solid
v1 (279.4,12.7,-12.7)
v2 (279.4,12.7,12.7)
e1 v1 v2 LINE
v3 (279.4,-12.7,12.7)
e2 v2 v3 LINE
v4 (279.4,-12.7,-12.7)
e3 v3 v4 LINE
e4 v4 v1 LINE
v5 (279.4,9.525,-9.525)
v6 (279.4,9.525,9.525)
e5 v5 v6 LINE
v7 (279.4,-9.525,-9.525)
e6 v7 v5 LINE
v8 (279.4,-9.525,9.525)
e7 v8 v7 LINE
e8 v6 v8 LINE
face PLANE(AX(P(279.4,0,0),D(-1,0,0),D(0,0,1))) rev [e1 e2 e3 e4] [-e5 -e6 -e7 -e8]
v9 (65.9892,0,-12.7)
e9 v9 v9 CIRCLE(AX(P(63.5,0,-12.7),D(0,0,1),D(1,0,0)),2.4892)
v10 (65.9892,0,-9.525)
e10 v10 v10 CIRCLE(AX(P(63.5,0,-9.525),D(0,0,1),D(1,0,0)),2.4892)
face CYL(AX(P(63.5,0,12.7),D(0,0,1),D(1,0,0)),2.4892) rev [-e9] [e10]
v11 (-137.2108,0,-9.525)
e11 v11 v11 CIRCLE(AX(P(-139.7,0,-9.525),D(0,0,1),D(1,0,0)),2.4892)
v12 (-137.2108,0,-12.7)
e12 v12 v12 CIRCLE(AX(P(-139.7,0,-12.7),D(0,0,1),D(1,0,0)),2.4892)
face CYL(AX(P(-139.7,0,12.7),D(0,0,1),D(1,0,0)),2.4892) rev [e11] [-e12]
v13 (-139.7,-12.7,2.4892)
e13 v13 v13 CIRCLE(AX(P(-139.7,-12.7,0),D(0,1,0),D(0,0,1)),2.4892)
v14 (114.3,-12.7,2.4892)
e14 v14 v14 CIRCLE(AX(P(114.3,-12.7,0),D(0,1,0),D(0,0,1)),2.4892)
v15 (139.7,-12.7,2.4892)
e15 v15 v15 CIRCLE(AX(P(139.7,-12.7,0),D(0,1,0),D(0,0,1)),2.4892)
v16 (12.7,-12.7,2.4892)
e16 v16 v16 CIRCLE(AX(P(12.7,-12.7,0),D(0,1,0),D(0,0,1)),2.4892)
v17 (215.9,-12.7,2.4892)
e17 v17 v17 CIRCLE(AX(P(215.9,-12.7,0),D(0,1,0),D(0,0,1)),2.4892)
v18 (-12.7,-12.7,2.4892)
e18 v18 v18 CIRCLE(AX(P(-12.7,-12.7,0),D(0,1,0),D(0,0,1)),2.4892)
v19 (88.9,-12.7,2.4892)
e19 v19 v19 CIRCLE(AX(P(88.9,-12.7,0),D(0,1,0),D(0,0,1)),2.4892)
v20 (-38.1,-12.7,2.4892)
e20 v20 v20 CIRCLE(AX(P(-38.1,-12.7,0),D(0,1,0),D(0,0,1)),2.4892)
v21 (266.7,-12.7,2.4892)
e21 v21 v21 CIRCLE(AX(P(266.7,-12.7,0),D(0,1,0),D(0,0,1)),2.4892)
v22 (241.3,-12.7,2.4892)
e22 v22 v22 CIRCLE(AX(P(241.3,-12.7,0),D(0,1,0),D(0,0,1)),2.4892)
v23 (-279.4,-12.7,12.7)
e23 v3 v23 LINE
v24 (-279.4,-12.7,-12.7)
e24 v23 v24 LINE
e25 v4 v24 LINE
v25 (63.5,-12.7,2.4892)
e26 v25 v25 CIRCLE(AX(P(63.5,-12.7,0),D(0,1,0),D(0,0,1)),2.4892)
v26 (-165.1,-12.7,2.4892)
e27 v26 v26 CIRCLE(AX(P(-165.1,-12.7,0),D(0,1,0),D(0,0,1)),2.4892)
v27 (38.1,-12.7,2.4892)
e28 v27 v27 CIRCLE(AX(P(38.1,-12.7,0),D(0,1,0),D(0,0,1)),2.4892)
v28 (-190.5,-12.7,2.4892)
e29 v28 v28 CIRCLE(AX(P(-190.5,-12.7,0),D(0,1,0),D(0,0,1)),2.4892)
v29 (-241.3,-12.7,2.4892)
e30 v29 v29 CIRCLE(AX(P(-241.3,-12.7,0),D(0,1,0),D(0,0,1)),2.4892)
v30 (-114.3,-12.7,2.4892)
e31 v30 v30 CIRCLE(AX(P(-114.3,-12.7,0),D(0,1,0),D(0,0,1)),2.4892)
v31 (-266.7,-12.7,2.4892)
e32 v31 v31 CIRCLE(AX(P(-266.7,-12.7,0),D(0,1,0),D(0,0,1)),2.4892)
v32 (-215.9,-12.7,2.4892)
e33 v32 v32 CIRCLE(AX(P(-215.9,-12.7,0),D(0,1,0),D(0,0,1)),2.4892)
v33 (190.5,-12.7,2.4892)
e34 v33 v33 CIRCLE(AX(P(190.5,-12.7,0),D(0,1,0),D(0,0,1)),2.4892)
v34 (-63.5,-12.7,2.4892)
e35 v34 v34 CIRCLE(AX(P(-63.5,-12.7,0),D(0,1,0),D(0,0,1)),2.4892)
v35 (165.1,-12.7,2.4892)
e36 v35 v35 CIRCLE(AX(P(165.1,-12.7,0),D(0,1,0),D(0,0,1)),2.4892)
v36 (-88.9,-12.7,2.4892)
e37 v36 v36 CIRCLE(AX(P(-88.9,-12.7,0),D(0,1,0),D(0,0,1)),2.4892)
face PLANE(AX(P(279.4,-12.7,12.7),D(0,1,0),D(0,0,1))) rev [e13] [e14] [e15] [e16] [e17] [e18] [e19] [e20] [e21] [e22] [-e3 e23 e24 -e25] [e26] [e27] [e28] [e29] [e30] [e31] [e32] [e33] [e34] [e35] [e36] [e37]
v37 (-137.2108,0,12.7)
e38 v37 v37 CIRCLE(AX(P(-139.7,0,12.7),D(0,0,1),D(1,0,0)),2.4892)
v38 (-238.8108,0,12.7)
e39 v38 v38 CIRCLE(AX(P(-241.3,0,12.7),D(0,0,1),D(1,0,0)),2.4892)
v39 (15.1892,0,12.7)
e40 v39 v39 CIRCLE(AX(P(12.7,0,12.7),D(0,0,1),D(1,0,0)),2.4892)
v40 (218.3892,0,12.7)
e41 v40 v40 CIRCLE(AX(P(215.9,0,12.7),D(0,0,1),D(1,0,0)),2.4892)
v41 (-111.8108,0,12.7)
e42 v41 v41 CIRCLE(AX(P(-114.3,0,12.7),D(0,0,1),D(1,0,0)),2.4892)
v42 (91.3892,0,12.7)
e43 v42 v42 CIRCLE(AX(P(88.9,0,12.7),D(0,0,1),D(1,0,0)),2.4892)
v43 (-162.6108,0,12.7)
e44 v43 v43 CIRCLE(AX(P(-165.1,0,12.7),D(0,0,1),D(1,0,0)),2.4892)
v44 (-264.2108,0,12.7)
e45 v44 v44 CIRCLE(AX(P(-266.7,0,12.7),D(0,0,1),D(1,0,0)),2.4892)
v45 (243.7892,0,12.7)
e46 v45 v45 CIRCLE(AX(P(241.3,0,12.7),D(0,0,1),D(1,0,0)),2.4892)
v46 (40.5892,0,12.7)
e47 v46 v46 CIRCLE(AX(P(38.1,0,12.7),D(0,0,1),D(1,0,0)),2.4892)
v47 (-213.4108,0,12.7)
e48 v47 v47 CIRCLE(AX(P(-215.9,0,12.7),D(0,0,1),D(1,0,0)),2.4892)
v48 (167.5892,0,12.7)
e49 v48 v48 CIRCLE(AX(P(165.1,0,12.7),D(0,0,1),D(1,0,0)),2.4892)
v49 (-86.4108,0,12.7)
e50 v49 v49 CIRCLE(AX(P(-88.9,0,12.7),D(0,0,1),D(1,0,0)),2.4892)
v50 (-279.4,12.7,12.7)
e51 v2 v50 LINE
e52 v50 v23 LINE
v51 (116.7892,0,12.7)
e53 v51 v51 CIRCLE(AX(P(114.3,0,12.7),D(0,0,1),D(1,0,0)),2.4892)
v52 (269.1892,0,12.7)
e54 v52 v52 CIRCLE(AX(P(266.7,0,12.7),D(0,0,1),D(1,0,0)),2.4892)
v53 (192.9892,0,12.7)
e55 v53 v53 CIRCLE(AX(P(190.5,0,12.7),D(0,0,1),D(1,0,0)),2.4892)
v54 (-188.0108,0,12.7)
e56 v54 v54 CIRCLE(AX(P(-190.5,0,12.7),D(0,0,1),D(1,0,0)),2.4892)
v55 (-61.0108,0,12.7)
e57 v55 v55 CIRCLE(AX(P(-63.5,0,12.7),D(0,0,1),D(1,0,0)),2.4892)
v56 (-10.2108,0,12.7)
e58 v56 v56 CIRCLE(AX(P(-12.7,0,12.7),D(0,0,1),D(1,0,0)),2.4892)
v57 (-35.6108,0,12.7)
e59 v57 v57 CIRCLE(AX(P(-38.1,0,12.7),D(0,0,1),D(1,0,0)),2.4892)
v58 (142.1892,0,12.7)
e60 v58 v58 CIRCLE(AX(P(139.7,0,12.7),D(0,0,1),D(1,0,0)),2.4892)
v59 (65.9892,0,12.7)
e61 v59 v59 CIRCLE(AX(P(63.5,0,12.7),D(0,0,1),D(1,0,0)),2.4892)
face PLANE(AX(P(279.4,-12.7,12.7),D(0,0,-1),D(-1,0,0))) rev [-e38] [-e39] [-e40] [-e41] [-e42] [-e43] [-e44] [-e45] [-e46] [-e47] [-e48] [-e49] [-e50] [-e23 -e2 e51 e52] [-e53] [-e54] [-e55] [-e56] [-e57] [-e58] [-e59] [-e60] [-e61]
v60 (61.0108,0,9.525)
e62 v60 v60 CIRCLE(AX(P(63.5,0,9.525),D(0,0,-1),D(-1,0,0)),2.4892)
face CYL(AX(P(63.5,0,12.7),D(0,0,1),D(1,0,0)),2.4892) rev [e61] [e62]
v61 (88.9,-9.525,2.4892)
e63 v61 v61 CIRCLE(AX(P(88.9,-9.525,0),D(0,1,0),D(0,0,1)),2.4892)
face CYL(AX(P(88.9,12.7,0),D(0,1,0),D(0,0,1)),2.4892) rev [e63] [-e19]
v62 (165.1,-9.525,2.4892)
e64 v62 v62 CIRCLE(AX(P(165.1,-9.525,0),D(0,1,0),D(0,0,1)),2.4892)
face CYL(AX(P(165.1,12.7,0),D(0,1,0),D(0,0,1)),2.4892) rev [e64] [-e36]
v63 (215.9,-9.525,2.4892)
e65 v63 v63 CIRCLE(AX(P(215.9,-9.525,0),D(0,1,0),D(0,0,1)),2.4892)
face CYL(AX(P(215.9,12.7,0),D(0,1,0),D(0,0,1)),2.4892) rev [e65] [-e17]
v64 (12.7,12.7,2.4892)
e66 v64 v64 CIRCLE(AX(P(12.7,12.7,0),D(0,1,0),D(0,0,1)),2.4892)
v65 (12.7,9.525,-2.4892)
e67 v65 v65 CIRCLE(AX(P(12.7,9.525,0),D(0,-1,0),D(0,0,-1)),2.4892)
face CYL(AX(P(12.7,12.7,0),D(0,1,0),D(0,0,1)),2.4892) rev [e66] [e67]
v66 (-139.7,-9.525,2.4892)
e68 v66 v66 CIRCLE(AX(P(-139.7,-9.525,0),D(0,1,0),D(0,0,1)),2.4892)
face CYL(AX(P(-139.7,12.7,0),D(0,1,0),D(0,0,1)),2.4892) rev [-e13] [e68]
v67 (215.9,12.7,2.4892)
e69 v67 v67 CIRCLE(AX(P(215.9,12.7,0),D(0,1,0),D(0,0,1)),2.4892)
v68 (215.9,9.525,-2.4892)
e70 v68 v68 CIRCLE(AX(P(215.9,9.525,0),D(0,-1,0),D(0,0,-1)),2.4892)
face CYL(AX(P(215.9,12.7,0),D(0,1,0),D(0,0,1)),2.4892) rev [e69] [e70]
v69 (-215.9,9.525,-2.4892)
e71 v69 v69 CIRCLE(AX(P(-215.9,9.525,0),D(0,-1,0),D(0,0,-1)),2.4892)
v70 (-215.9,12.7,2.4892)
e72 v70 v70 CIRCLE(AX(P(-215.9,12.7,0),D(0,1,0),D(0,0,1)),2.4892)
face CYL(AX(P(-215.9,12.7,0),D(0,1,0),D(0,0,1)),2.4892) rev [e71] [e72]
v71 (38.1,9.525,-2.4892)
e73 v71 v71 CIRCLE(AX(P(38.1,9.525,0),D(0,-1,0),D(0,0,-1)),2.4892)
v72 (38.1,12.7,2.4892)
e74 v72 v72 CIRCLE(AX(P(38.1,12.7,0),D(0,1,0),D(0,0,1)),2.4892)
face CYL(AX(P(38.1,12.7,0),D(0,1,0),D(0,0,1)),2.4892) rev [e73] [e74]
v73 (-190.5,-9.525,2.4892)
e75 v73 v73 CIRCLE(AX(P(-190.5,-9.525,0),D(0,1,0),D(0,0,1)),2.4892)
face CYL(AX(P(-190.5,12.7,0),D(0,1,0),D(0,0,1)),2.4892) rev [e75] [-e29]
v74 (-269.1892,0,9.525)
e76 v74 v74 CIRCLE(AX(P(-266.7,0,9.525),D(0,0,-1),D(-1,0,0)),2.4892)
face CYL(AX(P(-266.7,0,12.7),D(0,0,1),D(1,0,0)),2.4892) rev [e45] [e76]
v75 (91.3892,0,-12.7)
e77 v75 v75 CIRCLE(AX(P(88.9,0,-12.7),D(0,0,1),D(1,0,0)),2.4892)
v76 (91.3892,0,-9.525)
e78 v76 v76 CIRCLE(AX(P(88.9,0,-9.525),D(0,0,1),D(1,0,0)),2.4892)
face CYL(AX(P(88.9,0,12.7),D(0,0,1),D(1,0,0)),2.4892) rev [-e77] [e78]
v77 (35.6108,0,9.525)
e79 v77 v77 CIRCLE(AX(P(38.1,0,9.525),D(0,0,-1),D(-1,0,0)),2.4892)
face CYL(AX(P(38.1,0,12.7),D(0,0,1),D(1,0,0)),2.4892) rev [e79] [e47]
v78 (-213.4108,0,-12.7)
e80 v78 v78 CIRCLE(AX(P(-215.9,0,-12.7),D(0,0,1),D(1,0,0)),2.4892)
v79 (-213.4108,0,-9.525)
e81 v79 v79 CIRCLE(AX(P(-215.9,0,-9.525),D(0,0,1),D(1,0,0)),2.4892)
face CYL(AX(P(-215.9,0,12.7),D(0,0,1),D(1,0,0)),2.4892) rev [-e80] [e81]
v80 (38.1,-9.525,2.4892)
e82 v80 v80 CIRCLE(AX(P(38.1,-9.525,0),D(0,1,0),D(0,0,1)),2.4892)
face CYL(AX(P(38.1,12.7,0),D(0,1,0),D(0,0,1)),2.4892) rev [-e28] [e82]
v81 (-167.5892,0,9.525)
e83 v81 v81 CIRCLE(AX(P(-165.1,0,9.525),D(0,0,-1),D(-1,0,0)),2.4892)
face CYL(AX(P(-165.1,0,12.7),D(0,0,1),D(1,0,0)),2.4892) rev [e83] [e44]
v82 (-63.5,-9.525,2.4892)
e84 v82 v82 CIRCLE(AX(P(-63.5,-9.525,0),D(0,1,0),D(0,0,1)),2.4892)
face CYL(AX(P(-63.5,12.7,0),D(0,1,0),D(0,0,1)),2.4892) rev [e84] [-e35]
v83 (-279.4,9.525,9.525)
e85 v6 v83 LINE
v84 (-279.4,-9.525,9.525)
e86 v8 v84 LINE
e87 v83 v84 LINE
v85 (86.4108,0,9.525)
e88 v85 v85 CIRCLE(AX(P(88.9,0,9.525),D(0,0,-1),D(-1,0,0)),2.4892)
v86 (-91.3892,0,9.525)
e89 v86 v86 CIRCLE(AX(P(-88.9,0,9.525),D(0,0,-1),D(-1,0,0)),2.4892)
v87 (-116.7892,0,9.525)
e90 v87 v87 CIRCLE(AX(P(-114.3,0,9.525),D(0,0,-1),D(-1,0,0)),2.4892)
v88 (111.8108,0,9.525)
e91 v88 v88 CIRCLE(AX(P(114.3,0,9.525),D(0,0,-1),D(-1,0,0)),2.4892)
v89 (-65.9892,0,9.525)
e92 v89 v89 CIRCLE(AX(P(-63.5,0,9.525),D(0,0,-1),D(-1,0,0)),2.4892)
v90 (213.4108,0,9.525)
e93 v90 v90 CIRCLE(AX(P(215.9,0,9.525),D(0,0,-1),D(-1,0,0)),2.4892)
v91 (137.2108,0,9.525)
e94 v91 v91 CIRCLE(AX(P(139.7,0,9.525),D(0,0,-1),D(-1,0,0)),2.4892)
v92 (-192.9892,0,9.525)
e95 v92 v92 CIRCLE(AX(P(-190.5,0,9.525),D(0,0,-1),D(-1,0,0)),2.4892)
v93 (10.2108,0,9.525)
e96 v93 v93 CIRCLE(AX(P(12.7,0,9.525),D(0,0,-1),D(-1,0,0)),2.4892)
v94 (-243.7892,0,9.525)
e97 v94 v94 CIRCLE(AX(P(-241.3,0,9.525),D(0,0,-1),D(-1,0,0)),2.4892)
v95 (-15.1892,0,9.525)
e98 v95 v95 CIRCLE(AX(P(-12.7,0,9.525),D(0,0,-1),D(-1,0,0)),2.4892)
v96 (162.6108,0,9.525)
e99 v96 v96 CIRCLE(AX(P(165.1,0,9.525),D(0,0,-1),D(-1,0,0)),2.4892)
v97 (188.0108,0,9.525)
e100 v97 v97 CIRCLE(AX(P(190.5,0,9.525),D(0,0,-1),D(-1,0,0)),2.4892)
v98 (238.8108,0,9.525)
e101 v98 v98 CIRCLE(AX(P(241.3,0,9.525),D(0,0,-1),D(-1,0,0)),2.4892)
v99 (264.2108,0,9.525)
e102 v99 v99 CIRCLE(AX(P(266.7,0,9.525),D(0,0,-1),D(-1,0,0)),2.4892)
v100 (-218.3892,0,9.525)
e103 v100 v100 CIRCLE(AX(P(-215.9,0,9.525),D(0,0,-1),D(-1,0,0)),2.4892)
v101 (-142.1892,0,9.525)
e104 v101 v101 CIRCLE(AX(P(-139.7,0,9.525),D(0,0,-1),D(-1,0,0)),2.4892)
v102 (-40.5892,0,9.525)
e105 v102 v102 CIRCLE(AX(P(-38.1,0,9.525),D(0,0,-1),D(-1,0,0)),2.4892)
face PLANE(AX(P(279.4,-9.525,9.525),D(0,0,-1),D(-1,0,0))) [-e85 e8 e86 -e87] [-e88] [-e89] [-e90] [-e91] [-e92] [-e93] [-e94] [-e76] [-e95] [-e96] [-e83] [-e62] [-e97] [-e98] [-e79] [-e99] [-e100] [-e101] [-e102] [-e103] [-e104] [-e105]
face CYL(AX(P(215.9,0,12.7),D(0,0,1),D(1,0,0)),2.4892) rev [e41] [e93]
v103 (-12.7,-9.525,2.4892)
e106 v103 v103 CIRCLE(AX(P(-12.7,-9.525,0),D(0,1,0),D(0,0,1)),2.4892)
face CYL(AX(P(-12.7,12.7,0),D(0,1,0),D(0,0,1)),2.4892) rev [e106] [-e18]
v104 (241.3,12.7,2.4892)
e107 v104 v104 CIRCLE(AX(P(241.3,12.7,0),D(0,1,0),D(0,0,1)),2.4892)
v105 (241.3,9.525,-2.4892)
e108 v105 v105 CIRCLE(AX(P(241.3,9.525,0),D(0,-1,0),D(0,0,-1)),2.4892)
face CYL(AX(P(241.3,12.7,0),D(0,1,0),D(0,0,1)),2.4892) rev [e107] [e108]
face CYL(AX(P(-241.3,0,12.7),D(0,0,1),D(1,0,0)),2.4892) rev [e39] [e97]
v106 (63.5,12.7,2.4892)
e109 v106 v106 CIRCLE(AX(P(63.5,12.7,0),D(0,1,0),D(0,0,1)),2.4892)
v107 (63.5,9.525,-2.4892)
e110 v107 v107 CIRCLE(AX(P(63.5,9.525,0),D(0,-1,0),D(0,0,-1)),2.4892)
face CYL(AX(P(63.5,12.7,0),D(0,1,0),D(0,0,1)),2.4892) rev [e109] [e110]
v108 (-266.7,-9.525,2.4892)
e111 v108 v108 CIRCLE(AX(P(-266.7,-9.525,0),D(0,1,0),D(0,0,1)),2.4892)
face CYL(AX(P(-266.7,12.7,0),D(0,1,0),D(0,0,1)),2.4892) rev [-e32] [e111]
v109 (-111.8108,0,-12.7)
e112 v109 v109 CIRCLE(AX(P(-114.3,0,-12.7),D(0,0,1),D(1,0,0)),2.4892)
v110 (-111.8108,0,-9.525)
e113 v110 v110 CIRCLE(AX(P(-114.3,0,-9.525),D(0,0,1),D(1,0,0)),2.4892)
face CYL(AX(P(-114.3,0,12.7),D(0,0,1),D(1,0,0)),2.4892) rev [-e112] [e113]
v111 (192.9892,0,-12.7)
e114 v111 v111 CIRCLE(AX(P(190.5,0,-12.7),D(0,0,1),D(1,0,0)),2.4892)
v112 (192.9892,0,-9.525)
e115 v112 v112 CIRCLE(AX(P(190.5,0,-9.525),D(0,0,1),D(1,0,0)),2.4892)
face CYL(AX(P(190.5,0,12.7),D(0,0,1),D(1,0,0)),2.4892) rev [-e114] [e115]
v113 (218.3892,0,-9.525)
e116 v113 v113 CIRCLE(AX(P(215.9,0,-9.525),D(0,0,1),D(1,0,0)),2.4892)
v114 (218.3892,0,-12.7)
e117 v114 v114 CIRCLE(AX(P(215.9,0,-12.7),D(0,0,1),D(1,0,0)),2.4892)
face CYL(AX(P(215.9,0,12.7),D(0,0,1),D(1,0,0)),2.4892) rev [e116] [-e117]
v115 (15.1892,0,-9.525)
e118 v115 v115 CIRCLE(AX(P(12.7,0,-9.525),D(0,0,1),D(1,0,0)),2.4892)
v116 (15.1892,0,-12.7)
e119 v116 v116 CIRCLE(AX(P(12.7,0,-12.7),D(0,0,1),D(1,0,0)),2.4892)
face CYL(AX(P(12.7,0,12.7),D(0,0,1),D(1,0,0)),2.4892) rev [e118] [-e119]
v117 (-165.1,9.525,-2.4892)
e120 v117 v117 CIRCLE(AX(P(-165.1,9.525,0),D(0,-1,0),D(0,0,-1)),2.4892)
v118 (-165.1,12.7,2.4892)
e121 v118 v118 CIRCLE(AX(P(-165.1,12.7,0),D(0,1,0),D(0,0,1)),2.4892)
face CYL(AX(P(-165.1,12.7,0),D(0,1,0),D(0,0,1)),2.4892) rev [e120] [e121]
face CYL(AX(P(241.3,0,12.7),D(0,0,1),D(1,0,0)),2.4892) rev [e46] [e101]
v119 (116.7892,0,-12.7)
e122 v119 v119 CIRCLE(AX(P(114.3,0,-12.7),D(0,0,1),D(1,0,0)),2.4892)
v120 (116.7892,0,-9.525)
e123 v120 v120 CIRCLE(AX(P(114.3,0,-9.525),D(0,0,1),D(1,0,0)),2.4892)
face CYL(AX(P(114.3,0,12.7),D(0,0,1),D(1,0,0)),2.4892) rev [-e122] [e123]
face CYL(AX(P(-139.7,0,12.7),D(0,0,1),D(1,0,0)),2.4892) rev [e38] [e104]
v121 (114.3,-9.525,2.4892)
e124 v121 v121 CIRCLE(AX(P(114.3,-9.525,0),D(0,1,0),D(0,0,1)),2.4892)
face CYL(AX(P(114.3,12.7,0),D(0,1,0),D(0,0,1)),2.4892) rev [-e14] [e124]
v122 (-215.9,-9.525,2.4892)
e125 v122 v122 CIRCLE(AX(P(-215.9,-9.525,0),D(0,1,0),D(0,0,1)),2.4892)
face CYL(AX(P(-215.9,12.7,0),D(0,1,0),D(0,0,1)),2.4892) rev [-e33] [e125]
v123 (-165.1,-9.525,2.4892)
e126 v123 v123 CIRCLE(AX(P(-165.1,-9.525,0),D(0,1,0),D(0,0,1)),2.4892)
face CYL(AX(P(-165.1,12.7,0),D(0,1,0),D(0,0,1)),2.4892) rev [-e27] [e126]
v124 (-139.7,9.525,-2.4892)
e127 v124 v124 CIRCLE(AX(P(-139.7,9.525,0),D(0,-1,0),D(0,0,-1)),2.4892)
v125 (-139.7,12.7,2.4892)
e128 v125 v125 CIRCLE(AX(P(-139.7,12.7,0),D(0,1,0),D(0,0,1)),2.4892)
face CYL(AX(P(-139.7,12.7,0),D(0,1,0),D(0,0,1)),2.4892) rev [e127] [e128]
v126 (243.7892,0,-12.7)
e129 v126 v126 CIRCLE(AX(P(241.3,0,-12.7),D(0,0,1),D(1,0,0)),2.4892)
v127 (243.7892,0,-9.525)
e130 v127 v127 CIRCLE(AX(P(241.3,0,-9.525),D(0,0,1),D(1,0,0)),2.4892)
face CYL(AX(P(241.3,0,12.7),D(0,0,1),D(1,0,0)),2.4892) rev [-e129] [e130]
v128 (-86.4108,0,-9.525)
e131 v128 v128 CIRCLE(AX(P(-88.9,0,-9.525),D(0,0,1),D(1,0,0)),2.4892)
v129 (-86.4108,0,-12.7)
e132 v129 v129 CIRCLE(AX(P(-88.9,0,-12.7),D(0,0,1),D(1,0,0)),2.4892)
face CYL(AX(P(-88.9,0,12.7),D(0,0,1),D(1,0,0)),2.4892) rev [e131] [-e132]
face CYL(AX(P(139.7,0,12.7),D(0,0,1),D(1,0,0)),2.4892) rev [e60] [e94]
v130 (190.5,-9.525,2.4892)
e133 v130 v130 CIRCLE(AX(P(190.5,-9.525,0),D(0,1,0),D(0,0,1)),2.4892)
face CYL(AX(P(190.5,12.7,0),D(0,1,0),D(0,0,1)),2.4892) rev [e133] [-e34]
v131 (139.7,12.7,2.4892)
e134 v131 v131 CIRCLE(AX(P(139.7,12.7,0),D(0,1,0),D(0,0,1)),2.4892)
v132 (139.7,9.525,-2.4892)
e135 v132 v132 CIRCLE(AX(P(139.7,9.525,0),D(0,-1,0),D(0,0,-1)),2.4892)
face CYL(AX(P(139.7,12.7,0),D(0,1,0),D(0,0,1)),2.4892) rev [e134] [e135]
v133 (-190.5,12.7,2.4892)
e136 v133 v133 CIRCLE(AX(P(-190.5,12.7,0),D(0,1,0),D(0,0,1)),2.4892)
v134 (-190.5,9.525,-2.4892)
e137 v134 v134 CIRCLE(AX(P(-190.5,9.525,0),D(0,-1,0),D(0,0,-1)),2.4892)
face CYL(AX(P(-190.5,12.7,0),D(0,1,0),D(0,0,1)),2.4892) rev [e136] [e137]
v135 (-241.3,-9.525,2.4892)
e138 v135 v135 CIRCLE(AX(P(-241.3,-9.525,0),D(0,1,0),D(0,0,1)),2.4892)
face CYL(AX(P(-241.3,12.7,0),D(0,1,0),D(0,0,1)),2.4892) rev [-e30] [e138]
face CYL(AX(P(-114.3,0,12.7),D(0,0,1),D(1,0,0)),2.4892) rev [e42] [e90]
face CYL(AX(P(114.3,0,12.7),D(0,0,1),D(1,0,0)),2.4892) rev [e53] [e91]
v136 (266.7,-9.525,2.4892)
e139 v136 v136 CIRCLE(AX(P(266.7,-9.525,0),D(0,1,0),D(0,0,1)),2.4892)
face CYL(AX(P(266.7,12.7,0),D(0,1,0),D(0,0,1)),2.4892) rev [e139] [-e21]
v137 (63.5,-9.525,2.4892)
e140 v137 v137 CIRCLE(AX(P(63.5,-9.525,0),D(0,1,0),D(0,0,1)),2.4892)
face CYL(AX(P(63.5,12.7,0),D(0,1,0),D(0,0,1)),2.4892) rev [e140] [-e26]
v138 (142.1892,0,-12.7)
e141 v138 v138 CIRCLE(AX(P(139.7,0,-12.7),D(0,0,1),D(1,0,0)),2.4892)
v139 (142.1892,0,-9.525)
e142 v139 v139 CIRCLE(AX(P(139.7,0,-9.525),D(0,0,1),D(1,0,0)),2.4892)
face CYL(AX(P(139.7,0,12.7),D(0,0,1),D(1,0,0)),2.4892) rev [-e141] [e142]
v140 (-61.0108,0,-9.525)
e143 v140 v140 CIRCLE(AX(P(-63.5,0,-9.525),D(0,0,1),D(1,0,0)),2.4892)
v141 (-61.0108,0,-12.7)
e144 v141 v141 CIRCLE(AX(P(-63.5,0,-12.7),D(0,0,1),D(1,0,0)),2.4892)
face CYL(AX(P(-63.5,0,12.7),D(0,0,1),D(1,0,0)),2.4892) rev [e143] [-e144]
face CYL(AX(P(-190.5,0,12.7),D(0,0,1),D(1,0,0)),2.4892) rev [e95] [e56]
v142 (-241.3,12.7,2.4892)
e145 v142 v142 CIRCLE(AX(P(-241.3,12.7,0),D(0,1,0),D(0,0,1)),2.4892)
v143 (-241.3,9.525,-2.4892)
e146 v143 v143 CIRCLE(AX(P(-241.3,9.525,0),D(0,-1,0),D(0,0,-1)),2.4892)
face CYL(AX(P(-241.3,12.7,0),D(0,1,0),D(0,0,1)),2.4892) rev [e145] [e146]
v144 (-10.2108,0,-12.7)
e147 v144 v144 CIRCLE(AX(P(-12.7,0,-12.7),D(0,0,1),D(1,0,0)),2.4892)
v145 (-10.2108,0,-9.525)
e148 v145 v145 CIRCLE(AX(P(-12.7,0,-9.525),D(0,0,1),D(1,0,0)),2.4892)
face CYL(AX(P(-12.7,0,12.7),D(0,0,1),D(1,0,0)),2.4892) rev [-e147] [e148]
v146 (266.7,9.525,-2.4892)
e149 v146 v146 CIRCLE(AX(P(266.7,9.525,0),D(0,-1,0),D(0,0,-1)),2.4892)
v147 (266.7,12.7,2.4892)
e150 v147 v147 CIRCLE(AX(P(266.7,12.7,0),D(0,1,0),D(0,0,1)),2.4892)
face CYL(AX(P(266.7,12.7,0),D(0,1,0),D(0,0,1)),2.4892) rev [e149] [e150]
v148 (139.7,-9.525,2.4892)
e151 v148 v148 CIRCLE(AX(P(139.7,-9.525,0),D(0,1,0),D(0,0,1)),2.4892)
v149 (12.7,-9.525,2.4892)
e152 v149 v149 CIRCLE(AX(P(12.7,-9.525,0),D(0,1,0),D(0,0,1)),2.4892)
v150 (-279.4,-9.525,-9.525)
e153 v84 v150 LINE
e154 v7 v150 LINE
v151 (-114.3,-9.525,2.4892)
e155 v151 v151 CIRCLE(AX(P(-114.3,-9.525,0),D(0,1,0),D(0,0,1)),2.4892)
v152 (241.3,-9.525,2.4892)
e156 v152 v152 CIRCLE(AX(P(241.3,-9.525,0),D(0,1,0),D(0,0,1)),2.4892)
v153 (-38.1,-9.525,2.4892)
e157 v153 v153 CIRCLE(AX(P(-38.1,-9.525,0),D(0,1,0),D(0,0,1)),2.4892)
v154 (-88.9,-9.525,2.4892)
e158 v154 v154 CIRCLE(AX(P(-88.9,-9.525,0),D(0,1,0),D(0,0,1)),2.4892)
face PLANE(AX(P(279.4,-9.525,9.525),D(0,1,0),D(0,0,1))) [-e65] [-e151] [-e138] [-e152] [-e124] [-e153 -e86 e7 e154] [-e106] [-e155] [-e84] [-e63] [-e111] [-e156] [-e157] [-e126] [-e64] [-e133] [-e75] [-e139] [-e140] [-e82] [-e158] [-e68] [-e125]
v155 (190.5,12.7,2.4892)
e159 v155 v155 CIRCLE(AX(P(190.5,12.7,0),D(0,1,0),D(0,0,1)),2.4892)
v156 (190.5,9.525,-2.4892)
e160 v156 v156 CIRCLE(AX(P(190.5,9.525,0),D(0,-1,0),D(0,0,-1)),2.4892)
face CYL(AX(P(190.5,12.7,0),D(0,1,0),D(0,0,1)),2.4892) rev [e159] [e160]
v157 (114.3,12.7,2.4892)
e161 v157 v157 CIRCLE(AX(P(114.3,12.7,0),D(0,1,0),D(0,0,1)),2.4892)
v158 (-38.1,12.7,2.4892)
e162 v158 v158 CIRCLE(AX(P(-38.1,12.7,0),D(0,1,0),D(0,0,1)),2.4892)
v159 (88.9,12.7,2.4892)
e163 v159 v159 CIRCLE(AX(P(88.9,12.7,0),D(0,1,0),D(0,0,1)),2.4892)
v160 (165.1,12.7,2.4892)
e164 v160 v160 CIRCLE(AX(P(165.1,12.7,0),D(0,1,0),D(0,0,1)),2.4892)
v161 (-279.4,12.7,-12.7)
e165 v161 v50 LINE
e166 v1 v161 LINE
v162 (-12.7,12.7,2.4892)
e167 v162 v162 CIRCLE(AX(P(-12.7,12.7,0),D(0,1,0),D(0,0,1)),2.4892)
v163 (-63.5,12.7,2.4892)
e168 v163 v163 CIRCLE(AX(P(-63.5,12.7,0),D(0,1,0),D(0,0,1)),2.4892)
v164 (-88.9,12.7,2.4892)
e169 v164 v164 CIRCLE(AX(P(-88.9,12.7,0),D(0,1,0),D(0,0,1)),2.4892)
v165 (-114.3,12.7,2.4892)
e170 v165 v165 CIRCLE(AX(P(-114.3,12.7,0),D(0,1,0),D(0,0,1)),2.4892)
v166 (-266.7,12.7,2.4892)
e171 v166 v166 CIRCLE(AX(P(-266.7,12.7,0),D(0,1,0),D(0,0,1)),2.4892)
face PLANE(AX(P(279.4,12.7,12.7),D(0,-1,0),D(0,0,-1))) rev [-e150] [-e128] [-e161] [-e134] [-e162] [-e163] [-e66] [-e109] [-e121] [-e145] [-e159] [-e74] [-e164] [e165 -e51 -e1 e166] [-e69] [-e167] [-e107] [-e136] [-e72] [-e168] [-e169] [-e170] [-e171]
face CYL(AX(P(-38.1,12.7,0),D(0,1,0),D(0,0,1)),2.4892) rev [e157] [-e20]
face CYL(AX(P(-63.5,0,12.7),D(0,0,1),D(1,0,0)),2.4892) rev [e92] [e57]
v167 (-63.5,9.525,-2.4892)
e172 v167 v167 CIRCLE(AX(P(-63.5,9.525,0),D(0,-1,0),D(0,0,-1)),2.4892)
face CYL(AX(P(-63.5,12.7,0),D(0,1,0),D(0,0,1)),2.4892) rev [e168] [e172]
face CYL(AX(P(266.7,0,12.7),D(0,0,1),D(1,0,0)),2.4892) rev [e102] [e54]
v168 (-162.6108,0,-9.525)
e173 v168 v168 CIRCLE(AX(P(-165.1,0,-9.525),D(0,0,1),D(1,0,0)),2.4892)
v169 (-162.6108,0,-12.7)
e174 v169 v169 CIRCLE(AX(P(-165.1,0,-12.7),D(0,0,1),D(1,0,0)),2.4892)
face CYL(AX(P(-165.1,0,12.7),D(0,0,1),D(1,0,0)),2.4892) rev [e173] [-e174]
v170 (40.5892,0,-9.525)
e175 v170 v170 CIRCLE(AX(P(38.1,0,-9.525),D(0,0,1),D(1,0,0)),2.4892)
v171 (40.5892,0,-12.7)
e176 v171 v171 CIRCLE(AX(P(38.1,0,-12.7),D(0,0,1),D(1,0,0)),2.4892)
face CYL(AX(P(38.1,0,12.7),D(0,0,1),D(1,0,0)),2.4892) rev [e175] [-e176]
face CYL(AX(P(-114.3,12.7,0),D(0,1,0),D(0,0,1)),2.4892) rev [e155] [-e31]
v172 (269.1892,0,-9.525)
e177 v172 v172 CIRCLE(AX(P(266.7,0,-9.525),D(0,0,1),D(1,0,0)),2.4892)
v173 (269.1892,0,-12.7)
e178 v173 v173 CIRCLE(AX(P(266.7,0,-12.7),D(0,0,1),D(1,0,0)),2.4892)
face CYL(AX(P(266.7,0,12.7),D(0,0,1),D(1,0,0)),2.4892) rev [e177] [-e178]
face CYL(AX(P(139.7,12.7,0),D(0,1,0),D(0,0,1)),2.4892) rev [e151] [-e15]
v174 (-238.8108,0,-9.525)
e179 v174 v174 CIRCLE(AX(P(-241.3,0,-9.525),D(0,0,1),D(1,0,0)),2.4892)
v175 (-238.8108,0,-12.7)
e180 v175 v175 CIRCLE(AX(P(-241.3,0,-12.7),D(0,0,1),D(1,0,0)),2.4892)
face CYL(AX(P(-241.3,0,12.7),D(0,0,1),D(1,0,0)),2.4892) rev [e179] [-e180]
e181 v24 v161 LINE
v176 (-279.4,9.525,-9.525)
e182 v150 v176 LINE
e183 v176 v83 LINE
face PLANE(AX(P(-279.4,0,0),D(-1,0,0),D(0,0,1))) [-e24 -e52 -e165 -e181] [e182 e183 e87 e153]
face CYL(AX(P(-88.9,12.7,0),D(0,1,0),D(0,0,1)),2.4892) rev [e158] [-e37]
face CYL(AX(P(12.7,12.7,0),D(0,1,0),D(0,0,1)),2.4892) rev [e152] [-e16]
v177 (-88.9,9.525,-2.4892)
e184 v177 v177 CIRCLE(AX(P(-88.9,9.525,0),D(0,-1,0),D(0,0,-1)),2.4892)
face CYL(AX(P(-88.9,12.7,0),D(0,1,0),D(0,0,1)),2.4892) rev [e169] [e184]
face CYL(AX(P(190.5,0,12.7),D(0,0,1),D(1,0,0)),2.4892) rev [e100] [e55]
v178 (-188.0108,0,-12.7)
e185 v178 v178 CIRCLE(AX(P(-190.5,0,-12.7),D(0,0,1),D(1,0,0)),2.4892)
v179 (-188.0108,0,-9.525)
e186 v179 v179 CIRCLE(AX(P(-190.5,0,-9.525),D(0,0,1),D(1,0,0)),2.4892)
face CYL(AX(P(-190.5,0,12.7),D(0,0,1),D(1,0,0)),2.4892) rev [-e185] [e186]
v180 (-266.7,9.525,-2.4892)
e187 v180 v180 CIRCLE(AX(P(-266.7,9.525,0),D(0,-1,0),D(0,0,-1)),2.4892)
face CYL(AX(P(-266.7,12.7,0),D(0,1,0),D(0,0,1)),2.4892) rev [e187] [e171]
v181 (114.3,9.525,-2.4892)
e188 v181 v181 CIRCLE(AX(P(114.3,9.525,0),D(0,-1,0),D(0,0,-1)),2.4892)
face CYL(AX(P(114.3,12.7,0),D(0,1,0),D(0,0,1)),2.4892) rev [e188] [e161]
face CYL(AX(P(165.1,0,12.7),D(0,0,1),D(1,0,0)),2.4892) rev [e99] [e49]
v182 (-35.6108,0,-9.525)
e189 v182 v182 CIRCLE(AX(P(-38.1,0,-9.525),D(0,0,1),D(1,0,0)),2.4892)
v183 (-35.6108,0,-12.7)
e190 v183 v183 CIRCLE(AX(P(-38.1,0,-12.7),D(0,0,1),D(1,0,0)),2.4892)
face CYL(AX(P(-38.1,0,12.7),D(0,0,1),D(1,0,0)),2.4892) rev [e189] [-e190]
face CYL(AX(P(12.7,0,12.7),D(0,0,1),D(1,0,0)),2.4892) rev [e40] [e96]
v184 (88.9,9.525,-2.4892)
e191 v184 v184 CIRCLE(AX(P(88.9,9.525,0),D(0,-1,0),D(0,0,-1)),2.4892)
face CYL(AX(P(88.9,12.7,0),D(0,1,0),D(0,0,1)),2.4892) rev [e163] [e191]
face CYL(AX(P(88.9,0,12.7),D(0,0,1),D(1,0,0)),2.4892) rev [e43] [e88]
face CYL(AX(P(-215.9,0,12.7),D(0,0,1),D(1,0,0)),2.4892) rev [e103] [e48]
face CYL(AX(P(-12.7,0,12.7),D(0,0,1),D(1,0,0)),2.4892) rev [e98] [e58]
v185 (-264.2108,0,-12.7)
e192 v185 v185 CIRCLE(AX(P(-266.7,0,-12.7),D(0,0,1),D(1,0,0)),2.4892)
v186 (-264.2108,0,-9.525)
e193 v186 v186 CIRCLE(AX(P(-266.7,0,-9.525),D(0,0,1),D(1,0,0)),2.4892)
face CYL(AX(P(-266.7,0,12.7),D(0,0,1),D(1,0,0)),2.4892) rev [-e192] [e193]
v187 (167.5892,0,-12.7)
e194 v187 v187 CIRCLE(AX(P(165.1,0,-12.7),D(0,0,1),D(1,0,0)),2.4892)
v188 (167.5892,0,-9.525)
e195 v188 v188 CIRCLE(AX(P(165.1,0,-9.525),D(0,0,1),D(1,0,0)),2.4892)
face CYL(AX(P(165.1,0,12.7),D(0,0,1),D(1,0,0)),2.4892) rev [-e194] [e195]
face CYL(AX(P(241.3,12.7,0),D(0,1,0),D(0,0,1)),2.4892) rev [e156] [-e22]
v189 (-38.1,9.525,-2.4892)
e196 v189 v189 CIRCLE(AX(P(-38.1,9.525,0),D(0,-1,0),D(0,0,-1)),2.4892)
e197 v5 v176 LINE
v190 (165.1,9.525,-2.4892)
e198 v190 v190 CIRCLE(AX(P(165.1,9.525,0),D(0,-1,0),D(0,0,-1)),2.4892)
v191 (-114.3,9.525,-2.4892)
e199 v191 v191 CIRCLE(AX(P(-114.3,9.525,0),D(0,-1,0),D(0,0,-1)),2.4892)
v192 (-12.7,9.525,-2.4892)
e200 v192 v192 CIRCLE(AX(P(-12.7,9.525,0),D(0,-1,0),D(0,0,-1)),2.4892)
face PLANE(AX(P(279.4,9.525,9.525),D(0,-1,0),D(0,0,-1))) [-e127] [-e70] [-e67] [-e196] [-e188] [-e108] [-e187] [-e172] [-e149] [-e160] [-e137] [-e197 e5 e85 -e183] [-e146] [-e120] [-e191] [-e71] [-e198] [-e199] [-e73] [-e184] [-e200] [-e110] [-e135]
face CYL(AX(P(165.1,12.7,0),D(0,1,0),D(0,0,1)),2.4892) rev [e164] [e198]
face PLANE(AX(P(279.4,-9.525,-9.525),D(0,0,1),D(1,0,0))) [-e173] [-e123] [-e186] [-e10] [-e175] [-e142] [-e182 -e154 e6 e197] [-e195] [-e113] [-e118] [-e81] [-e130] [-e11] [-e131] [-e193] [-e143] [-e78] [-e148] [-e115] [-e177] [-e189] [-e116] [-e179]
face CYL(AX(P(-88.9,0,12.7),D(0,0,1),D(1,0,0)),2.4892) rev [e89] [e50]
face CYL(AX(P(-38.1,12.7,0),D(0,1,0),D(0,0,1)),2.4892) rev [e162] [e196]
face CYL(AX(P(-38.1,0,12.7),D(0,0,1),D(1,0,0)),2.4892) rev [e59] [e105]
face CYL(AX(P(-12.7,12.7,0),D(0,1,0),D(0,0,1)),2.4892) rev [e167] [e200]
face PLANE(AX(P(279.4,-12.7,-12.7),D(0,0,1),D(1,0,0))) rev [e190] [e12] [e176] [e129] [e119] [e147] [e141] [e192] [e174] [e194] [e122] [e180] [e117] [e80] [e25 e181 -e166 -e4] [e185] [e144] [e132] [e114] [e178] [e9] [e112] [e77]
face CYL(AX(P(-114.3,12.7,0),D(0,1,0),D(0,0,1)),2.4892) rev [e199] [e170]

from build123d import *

# Parameters (mm, degrees)
SKETCH1_W             = 25.4
SKETCH1_H             = 25.4
SKETCH1_W_2           = 19.05
SKETCH1_H_2           = 19.05
BOSS_EXTRUDE1_DEPTH   = 279.4
SKETCH3_W             = 2.4892
SKETCH3_H             = 25.4
SKETCH3_AT_POINT_2_W  = 2.4892
SKETCH3_AT_POINT_2_H  = 25.4
LPATTERN1_START       = -12.7
LPATTERN1_OUTLINE_R   = 2.4892
LPATTERN1_DEPTH       = 25.4
LPATTERN1_2_OUTLINE_R = 2.4892
LPATTERN1_2_DEPTH     = 25.4


# Read off the part's stored shape, not the designer's step: LPattern1
with BuildPart() as part:
    # Sketch1 → Boss-Extrude1 (new, symmetric)
    with BuildSketch(Plane(origin=(0, 0, 0), x_dir=(0, 0, -1), z_dir=(1, 0, 0))):
        Rectangle(SKETCH1_W, SKETCH1_H)
        Rectangle(SKETCH1_W_2, SKETCH1_H_2, mode=Mode.SUBTRACT)
    extrude(amount=BOSS_EXTRUDE1_DEPTH, both=True)

    # Sketch3 → #9 (0.196) Diameter Hole1 (revolve, cut)
    with BuildSketch(Plane(origin=(266.7, 12.7, 0), x_dir=(0, 0, 1), z_dir=(1, 0, 0))):
        with Locations((1.2446, 12.7)):
            Rectangle(SKETCH3_W, SKETCH3_H)
    revolve(axis=Axis((266.7, 19.05, 0), (0, -1, 0)), mode=Mode.SUBTRACT)

    # Sketch3 at point 2 (carried to point 2, square into its face) → #9 (0.196) Diameter Hole1 at 2 (revolve, cut)
    with BuildSketch(Plane(origin=(266.7, 0, 12.7), x_dir=(0, -1, 0), z_dir=(1, 0, 0))):
        with Locations((1.2446, 12.7)):
            Rectangle(SKETCH3_AT_POINT_2_W, SKETCH3_AT_POINT_2_H)
    revolve(axis=Axis((266.7, 0, 19.05), (0, 0, -1)), mode=Mode.SUBTRACT)

    # LPattern1 outline → LPattern1 (cut)
    with BuildSketch(Plane.XY.offset(LPATTERN1_START)):
        with Locations((241.3, 0)):
            Circle(LPATTERN1_OUTLINE_R)
        with Locations((215.9, 0)):
            Circle(LPATTERN1_OUTLINE_R)
        with Locations((190.5, 0)):
            Circle(LPATTERN1_OUTLINE_R)
        with Locations((165.1, 0)):
            Circle(LPATTERN1_OUTLINE_R)
        with Locations((139.7, 0)):
            Circle(LPATTERN1_OUTLINE_R)
        with Locations((114.3, 0)):
            Circle(LPATTERN1_OUTLINE_R)
        with Locations((88.9, 0)):
            Circle(LPATTERN1_OUTLINE_R)
        with Locations((63.5, 0)):
            Circle(LPATTERN1_OUTLINE_R)
        with Locations((38.1, 0)):
            Circle(LPATTERN1_OUTLINE_R)
        with Locations((12.7, 0)):
            Circle(LPATTERN1_OUTLINE_R)
        with Locations((-12.7, 0)):
            Circle(LPATTERN1_OUTLINE_R)
        with Locations((-38.1, 0)):
            Circle(LPATTERN1_OUTLINE_R)
        with Locations((-63.5, 0)):
            Circle(LPATTERN1_OUTLINE_R)
        with Locations((-88.9, 0)):
            Circle(LPATTERN1_OUTLINE_R)
        with Locations((-114.3, 0)):
            Circle(LPATTERN1_OUTLINE_R)
        with Locations((-139.7, 0)):
            Circle(LPATTERN1_OUTLINE_R)
        with Locations((-165.1, 0)):
            Circle(LPATTERN1_OUTLINE_R)
        with Locations((-190.5, 0)):
            Circle(LPATTERN1_OUTLINE_R)
        with Locations((-215.9, 0)):
            Circle(LPATTERN1_OUTLINE_R)
        with Locations((-241.3, 0)):
            Circle(LPATTERN1_OUTLINE_R)
        with Locations((-266.7, 0)):
            Circle(LPATTERN1_OUTLINE_R)
    extrude(amount=LPATTERN1_DEPTH, mode=Mode.SUBTRACT)

    # LPattern1 2 outline → LPattern1 2 (cut)
    with BuildSketch(Plane(origin=(0, 0, 0), x_dir=(1, 0, 0), z_dir=(0, 1, 0)).offset(LPATTERN1_START)):
        with Locations((241.3, 0)):
            Circle(LPATTERN1_2_OUTLINE_R)
        with Locations((215.9, 0)):
            Circle(LPATTERN1_2_OUTLINE_R)
        with Locations((190.5, 0)):
            Circle(LPATTERN1_2_OUTLINE_R)
        with Locations((165.1, 0)):
            Circle(LPATTERN1_2_OUTLINE_R)
        with Locations((139.7, 0)):
            Circle(LPATTERN1_2_OUTLINE_R)
        with Locations((114.3, 0)):
            Circle(LPATTERN1_2_OUTLINE_R)
        with Locations((88.9, 0)):
            Circle(LPATTERN1_2_OUTLINE_R)
        with Locations((63.5, 0)):
            Circle(LPATTERN1_2_OUTLINE_R)
        with Locations((38.1, 0)):
            Circle(LPATTERN1_2_OUTLINE_R)
        with Locations((12.7, 0)):
            Circle(LPATTERN1_2_OUTLINE_R)
        with Locations((-12.7, 0)):
            Circle(LPATTERN1_2_OUTLINE_R)
        with Locations((-38.1, 0)):
            Circle(LPATTERN1_2_OUTLINE_R)
        with Locations((-63.5, 0)):
            Circle(LPATTERN1_2_OUTLINE_R)
        with Locations((-88.9, 0)):
            Circle(LPATTERN1_2_OUTLINE_R)
        with Locations((-114.3, 0)):
            Circle(LPATTERN1_2_OUTLINE_R)
        with Locations((-139.7, 0)):
            Circle(LPATTERN1_2_OUTLINE_R)
        with Locations((-165.1, 0)):
            Circle(LPATTERN1_2_OUTLINE_R)
        with Locations((-190.5, 0)):
            Circle(LPATTERN1_2_OUTLINE_R)
        with Locations((-215.9, 0)):
            Circle(LPATTERN1_2_OUTLINE_R)
        with Locations((-241.3, 0)):
            Circle(LPATTERN1_2_OUTLINE_R)
        with Locations((-266.7, 0)):
            Circle(LPATTERN1_2_OUTLINE_R)
    extrude(amount=LPATTERN1_2_DEPTH, mode=Mode.SUBTRACT)


solid = part.part
